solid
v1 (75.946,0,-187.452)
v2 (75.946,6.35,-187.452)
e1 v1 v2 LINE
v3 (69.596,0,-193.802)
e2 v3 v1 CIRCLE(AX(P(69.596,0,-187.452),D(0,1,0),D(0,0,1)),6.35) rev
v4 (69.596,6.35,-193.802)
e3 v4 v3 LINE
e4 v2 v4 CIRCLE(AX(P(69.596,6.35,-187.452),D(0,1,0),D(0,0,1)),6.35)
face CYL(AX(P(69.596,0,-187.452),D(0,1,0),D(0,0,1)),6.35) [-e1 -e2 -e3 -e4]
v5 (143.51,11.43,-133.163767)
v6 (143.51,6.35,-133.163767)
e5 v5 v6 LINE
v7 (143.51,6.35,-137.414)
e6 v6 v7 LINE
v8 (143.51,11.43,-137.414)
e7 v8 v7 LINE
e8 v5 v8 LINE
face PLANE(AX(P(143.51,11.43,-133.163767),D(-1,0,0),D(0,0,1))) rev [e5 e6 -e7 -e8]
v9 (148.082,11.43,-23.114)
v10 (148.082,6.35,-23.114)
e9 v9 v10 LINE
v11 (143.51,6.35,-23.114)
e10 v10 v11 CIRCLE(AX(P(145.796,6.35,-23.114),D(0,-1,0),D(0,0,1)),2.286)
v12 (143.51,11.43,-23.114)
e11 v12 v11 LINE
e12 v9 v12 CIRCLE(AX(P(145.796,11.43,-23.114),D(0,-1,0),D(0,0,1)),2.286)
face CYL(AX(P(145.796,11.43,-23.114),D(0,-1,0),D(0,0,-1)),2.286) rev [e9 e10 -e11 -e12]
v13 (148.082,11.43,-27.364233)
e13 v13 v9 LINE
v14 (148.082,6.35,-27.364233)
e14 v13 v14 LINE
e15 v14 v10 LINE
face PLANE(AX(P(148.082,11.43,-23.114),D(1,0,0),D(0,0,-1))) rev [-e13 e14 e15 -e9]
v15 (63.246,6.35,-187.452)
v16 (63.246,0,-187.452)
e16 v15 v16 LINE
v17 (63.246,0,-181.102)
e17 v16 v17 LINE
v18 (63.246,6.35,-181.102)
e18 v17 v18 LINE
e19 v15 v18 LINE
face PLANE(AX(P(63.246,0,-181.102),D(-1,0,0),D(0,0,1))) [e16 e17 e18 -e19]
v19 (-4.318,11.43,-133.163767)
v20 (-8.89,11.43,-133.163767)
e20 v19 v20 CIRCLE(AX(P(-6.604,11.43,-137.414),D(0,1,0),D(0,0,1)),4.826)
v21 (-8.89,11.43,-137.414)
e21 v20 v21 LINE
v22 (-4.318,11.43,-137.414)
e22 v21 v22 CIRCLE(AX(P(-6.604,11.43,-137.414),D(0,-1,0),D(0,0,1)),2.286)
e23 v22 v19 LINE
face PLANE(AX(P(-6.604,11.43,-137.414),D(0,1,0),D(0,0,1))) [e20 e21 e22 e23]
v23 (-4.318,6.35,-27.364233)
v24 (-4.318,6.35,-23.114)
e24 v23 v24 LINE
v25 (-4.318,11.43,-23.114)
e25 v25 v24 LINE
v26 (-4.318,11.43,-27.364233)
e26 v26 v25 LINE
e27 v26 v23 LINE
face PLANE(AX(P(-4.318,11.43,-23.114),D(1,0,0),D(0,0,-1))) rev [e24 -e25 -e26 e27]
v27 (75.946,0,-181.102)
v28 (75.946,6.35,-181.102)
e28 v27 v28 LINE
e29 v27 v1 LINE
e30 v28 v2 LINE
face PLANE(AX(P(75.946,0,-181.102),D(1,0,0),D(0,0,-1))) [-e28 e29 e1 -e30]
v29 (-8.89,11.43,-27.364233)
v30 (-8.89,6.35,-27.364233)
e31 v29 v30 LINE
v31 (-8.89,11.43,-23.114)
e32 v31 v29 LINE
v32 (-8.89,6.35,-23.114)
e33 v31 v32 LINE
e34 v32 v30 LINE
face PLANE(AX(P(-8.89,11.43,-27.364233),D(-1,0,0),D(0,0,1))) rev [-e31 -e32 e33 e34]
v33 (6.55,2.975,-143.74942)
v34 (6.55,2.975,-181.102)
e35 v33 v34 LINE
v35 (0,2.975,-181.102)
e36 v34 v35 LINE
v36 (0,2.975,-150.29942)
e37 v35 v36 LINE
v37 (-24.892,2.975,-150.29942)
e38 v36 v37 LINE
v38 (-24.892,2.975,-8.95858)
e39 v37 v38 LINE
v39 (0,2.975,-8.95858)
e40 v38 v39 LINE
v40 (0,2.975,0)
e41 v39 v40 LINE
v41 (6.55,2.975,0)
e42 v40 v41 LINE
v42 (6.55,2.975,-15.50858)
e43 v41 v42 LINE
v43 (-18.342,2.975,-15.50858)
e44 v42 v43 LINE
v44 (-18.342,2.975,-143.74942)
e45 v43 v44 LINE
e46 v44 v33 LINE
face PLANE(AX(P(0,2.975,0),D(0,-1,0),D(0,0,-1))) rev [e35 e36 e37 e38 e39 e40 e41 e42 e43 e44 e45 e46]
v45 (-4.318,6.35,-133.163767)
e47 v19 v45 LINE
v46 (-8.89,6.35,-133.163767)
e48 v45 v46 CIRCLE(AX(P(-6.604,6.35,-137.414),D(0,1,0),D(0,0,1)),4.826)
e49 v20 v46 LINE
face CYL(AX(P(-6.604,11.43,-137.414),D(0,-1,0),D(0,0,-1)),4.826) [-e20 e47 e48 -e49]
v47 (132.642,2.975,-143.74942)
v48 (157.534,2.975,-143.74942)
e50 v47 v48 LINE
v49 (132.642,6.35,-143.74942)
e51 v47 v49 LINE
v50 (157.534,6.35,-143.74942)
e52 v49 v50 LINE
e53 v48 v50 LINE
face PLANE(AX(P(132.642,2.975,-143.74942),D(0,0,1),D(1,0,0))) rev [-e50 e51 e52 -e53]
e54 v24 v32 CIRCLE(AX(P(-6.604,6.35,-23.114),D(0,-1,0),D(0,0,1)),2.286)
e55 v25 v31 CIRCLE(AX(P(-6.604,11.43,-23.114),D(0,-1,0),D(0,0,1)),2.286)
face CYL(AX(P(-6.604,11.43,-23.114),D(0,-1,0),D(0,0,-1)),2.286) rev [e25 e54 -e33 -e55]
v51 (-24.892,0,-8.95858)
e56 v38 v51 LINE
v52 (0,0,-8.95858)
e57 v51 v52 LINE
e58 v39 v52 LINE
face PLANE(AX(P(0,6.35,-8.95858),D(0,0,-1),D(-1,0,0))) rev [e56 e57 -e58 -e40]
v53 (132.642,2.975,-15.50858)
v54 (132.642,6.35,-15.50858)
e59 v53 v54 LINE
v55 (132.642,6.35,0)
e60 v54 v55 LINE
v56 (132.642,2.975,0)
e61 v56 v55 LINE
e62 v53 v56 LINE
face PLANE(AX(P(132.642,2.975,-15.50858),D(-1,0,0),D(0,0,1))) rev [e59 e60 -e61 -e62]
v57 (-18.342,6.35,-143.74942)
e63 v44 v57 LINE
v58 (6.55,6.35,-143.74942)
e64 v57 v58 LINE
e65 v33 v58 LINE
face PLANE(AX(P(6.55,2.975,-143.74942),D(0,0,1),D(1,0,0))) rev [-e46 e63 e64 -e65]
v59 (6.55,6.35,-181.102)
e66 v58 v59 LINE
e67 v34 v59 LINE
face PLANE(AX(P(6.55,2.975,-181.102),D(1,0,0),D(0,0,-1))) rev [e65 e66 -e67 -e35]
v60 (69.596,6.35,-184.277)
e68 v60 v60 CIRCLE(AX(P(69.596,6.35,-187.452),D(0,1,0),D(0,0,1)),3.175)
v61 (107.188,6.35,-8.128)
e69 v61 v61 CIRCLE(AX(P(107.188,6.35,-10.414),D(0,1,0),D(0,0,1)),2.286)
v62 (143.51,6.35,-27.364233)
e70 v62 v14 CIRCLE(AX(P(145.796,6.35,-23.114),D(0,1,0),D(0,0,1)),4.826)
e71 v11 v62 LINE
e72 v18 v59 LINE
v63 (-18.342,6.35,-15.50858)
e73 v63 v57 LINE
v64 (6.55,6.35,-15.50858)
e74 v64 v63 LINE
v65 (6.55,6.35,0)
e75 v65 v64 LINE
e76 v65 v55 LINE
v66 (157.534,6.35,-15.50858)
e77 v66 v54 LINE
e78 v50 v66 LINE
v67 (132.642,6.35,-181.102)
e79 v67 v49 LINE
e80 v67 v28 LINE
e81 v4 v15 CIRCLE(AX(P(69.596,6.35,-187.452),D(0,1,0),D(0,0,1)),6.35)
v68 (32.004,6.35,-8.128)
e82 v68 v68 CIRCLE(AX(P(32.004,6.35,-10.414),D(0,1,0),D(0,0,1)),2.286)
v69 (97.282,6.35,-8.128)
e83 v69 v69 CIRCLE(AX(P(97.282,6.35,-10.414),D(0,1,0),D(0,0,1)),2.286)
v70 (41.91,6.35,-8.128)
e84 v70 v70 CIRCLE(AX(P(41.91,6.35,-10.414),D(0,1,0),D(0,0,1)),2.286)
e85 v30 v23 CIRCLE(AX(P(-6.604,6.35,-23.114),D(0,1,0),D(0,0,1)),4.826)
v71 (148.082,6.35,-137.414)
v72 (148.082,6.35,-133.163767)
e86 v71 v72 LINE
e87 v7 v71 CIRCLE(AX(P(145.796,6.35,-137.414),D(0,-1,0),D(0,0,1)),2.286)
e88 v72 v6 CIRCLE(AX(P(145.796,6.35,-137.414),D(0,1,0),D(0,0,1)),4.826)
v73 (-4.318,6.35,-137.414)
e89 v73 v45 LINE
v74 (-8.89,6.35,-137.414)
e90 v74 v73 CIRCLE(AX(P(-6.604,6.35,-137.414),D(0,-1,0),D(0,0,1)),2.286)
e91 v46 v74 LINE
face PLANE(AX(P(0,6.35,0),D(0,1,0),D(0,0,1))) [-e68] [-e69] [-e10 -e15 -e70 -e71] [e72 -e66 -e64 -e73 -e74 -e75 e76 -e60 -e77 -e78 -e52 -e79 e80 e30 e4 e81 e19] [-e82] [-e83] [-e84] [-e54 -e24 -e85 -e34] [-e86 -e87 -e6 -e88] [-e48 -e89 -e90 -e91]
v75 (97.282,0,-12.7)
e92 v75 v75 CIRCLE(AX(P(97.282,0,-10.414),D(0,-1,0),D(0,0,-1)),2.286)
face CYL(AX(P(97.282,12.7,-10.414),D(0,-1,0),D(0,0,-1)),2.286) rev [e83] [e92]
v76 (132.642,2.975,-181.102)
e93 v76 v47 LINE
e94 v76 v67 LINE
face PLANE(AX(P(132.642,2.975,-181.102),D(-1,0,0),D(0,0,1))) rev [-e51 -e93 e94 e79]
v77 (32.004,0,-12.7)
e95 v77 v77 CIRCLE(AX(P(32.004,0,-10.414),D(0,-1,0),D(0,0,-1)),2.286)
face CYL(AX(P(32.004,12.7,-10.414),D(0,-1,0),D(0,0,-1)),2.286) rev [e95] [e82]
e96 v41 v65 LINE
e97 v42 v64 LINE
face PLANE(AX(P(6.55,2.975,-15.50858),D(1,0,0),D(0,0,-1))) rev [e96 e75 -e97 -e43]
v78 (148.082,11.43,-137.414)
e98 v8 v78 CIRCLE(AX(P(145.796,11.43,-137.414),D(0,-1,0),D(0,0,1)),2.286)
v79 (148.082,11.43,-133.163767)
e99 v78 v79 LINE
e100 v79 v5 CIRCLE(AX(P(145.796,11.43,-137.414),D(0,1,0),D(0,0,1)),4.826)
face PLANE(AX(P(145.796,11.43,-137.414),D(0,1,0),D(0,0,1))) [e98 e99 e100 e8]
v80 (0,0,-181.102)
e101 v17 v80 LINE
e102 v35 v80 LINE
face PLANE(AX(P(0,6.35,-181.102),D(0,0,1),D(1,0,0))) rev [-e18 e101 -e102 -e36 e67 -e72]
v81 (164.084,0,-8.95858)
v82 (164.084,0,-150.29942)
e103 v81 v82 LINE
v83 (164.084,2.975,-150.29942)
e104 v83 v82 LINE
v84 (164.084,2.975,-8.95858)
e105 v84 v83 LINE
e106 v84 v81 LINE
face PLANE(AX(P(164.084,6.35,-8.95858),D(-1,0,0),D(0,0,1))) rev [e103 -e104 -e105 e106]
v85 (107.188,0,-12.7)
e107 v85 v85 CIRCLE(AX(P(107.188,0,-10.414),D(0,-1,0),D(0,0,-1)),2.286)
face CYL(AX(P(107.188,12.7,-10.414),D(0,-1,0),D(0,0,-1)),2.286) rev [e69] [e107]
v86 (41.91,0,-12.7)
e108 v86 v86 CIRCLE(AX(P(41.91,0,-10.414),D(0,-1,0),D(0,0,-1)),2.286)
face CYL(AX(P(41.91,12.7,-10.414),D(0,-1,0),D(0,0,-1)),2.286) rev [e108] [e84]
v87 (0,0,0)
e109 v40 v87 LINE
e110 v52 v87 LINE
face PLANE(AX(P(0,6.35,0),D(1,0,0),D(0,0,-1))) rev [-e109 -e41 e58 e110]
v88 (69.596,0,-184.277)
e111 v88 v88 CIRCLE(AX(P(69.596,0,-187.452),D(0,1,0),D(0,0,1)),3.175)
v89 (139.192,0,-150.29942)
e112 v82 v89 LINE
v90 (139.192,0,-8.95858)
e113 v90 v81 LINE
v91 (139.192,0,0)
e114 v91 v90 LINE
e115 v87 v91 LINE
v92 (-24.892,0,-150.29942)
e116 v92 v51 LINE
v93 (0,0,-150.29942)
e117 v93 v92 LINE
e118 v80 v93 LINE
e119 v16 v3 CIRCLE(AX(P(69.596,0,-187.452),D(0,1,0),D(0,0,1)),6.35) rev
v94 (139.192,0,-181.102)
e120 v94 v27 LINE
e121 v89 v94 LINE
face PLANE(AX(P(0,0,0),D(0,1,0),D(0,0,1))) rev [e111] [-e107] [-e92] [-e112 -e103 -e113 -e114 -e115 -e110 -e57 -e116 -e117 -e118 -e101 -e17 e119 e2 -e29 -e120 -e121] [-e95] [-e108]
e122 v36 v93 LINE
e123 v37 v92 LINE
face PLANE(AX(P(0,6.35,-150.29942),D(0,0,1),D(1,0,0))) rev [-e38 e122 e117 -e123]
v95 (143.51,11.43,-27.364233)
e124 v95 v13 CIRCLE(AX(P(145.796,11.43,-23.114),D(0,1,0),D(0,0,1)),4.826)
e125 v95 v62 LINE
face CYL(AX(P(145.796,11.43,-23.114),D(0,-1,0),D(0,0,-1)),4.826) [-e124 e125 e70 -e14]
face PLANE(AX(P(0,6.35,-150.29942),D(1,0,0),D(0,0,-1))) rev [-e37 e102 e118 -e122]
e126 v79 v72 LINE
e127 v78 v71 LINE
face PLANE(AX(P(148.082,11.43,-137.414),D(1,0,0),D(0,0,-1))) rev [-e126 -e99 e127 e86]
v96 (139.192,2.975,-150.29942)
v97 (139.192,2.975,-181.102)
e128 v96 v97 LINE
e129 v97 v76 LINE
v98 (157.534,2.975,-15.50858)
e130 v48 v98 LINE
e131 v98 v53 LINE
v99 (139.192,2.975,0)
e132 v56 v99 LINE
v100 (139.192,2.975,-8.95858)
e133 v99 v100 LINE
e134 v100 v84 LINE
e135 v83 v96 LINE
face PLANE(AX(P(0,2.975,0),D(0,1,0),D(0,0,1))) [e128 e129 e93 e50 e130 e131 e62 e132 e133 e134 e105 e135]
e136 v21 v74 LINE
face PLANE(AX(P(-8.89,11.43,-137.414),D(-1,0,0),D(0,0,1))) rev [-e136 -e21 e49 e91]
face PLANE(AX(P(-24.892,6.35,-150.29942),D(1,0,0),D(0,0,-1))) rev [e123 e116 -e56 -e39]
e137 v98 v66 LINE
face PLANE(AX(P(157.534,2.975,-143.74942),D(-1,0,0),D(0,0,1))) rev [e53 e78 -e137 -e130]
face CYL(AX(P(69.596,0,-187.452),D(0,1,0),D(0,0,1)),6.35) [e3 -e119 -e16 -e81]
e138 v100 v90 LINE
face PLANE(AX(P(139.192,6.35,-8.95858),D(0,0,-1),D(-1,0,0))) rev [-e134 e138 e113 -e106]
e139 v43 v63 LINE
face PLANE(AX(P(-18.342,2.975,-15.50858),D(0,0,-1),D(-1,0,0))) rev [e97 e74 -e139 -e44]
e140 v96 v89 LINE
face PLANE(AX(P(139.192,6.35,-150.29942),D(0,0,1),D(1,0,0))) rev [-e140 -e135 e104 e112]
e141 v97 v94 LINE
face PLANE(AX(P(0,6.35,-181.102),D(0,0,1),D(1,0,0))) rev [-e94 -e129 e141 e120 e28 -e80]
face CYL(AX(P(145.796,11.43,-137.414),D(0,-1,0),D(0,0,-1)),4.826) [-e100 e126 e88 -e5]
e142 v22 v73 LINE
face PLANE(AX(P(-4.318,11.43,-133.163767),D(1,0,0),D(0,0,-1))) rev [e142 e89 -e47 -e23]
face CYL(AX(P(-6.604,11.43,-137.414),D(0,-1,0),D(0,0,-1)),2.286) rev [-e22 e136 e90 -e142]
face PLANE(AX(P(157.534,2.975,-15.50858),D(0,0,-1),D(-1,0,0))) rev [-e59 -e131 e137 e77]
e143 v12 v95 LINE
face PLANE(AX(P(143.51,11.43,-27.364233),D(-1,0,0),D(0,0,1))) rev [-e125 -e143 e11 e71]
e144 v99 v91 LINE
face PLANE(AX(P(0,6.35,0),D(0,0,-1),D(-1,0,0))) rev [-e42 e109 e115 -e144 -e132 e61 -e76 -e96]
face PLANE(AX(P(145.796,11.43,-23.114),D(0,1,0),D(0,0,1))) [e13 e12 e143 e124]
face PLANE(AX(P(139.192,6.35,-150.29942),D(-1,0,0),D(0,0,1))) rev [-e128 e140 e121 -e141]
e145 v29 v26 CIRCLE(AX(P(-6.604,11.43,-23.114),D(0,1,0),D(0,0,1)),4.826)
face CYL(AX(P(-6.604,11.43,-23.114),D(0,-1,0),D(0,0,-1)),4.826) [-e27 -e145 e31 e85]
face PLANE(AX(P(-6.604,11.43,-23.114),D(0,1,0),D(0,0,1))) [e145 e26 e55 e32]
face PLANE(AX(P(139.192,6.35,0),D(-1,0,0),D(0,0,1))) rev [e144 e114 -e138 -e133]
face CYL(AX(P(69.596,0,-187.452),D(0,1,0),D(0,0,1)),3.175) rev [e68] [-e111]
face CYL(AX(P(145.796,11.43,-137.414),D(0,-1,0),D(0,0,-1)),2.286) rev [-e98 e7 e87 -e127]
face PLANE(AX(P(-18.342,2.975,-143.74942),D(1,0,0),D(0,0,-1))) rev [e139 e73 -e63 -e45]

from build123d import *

# Parameters (mm, degrees)
BOSS_EXTRUDE1_DEPTH = 6.35
CUT_EXTRUDE1_DEPTH  = 3.375
SKETCH3_W           = 12.7
SKETCH3_H           = 12.7
BOSS_EXTRUDE2_DEPTH = 6.35
FILLET1_R           = 6.35
SKETCH4_R           = 3.175
CUT_EXTRUDE2_DEPTH  = 255.013969616
SKETCH5_R           = 2.286
CUT_EXTRUDE3_DEPTH  = 12.7
BOSS_EXTRUDE3_DEPTH = 5.08


with BuildPart() as part:
    # Sketch1 → Boss-Extrude1 (new body)
    with BuildSketch(Plane(origin=(0, 0, 0), x_dir=(1, 0, 0), z_dir=(0, 1, 0))):
        Polygon((0, 150.29942), (0, 181.102), (139.192, 181.102), (139.192, 150.29942), (164.084, 150.29942), (164.084, 8.95858), (139.192, 8.95858), (139.192, 0), (0, 0), (0, 8.95858), (-24.892, 8.95858), (-24.892, 150.29942), align=None)
    extrude(amount=BOSS_EXTRUDE1_DEPTH)

    # Sketch2 → Cut-Extrude1 (cut)
    with BuildSketch(Plane(origin=(0, 6.35, 0), x_dir=(1, 0, 0), z_dir=(0, 1, 0))):
        Polygon((132.6420004, 181.102), (132.6420004, 143.7494204), (157.5340004, 143.7494204), (157.5340004, 15.5085796), (132.6420004, 15.5085796), (132.6420004, 0), (139.192, 0), (139.192, 8.95858), (164.084, 8.95858), (164.084, 150.29942), (139.192, 150.29942), (139.192, 181.102), align=None)
        Polygon((0, 181.102), (6.5499996, 181.102), (6.5499996, 143.7494204), (-18.3420004, 143.7494204), (-18.3420004, 15.5085796), (6.5499996, 15.5085796), (6.5499996, 0), (0, 0), (0, 8.95858), (-24.892, 8.95858), (-24.892, 150.29942), (0, 150.29942), align=None)
    extrude(amount=-CUT_EXTRUDE1_DEPTH, mode=Mode.SUBTRACT)

    # Sketch3 → Boss-Extrude2 (add)
    with BuildSketch(Plane(origin=(0, 6.35, 0), x_dir=(1, 0, 0), z_dir=(0, 1, 0))):
        with Locations((69.596, 187.452)):
            Rectangle(SKETCH3_W, SKETCH3_H)
    extrude(amount=-BOSS_EXTRUDE2_DEPTH)

    # Fillet1
    fillet1_edges = [part.edges().sort_by_distance(p)[0] for p in [
        (63.246, 3.175, -193.802),
        (75.946, 3.175, -193.802),
    ]]
    fillet(fillet1_edges, radius=FILLET1_R - 0.0001)  # a hair under: the kernel refuses the full size

    # Sketch4 → Cut-Extrude2 (cut, through all)
    with BuildSketch(Plane(origin=(0, 6.35, 0), x_dir=(1, 0, 0), z_dir=(0, 1, 0))):
        with Locations(Location((69.596, 187.452, 0), (0, 0, 270))):
            Circle(SKETCH4_R)
    extrude(amount=-CUT_EXTRUDE2_DEPTH, mode=Mode.SUBTRACT)

    # Sketch5 → Cut-Extrude3 (cut)
    with BuildSketch(Plane.XZ):
        with Locations(Location((107.188, -10.414, 0), (0, 0, 270))):
            Circle(SKETCH5_R)
        with Locations(Location((97.282, -10.414, 0), (0, 0, 270))):
            Circle(SKETCH5_R)
        with Locations(Location((41.91, -10.414, 0), (0, 0, 270))):
            Circle(SKETCH5_R)
        with Locations(Location((32.004, -10.414, 0), (0, 0, 270))):
            Circle(SKETCH5_R)
    extrude(amount=-CUT_EXTRUDE3_DEPTH, mode=Mode.SUBTRACT)

    # Sketch6 → Boss-Extrude3 (add)
    with BuildSketch(Plane(origin=(0, 6.35, 0), x_dir=(1, 0, 0), z_dir=(0, 1, 0))):
        with BuildLine():
            Line((-4.318, 23.114), (-4.318, 27.364232935))
            ThreePointArc((-4.318, 27.364232935), (-6.604, 18.288), (-8.89, 27.364232935))
            Line((-8.89, 27.364232935), (-8.89, 23.114))
            ThreePointArc((-8.89, 23.114), (-6.604, 20.828), (-4.318, 23.114))
        make_face()
        with BuildLine():
            Line((-8.89, 137.414), (-8.89, 133.163767065))
            ThreePointArc((-8.89, 133.163767065), (-6.604, 142.24), (-4.318, 133.163767065))
            Line((-4.318, 133.163767065), (-4.318, 137.414))
            ThreePointArc((-4.318, 137.414), (-6.604, 139.7), (-8.89, 137.414))
        make_face()
        with BuildLine():
            Line((148.082, 23.114), (148.082, 27.364232935))
            ThreePointArc((148.082, 27.364232935), (145.796, 18.288), (143.51, 27.364232935))
            Line((143.51, 27.364232935), (143.51, 23.114))
            ThreePointArc((143.51, 23.114), (145.796, 20.828), (148.082, 23.114))
        make_face()
        with BuildLine():
            Line((148.082, 137.414), (148.082, 133.163767065))
            ThreePointArc((148.082, 133.163767065), (145.796, 142.24), (143.51, 133.163767065))
            Line((143.51, 133.163767065), (143.51, 137.414))
            ThreePointArc((143.51, 137.414), (145.796, 139.7), (148.082, 137.414))
        make_face()
    extrude(amount=BOSS_EXTRUDE3_DEPTH)


solid = part.part
